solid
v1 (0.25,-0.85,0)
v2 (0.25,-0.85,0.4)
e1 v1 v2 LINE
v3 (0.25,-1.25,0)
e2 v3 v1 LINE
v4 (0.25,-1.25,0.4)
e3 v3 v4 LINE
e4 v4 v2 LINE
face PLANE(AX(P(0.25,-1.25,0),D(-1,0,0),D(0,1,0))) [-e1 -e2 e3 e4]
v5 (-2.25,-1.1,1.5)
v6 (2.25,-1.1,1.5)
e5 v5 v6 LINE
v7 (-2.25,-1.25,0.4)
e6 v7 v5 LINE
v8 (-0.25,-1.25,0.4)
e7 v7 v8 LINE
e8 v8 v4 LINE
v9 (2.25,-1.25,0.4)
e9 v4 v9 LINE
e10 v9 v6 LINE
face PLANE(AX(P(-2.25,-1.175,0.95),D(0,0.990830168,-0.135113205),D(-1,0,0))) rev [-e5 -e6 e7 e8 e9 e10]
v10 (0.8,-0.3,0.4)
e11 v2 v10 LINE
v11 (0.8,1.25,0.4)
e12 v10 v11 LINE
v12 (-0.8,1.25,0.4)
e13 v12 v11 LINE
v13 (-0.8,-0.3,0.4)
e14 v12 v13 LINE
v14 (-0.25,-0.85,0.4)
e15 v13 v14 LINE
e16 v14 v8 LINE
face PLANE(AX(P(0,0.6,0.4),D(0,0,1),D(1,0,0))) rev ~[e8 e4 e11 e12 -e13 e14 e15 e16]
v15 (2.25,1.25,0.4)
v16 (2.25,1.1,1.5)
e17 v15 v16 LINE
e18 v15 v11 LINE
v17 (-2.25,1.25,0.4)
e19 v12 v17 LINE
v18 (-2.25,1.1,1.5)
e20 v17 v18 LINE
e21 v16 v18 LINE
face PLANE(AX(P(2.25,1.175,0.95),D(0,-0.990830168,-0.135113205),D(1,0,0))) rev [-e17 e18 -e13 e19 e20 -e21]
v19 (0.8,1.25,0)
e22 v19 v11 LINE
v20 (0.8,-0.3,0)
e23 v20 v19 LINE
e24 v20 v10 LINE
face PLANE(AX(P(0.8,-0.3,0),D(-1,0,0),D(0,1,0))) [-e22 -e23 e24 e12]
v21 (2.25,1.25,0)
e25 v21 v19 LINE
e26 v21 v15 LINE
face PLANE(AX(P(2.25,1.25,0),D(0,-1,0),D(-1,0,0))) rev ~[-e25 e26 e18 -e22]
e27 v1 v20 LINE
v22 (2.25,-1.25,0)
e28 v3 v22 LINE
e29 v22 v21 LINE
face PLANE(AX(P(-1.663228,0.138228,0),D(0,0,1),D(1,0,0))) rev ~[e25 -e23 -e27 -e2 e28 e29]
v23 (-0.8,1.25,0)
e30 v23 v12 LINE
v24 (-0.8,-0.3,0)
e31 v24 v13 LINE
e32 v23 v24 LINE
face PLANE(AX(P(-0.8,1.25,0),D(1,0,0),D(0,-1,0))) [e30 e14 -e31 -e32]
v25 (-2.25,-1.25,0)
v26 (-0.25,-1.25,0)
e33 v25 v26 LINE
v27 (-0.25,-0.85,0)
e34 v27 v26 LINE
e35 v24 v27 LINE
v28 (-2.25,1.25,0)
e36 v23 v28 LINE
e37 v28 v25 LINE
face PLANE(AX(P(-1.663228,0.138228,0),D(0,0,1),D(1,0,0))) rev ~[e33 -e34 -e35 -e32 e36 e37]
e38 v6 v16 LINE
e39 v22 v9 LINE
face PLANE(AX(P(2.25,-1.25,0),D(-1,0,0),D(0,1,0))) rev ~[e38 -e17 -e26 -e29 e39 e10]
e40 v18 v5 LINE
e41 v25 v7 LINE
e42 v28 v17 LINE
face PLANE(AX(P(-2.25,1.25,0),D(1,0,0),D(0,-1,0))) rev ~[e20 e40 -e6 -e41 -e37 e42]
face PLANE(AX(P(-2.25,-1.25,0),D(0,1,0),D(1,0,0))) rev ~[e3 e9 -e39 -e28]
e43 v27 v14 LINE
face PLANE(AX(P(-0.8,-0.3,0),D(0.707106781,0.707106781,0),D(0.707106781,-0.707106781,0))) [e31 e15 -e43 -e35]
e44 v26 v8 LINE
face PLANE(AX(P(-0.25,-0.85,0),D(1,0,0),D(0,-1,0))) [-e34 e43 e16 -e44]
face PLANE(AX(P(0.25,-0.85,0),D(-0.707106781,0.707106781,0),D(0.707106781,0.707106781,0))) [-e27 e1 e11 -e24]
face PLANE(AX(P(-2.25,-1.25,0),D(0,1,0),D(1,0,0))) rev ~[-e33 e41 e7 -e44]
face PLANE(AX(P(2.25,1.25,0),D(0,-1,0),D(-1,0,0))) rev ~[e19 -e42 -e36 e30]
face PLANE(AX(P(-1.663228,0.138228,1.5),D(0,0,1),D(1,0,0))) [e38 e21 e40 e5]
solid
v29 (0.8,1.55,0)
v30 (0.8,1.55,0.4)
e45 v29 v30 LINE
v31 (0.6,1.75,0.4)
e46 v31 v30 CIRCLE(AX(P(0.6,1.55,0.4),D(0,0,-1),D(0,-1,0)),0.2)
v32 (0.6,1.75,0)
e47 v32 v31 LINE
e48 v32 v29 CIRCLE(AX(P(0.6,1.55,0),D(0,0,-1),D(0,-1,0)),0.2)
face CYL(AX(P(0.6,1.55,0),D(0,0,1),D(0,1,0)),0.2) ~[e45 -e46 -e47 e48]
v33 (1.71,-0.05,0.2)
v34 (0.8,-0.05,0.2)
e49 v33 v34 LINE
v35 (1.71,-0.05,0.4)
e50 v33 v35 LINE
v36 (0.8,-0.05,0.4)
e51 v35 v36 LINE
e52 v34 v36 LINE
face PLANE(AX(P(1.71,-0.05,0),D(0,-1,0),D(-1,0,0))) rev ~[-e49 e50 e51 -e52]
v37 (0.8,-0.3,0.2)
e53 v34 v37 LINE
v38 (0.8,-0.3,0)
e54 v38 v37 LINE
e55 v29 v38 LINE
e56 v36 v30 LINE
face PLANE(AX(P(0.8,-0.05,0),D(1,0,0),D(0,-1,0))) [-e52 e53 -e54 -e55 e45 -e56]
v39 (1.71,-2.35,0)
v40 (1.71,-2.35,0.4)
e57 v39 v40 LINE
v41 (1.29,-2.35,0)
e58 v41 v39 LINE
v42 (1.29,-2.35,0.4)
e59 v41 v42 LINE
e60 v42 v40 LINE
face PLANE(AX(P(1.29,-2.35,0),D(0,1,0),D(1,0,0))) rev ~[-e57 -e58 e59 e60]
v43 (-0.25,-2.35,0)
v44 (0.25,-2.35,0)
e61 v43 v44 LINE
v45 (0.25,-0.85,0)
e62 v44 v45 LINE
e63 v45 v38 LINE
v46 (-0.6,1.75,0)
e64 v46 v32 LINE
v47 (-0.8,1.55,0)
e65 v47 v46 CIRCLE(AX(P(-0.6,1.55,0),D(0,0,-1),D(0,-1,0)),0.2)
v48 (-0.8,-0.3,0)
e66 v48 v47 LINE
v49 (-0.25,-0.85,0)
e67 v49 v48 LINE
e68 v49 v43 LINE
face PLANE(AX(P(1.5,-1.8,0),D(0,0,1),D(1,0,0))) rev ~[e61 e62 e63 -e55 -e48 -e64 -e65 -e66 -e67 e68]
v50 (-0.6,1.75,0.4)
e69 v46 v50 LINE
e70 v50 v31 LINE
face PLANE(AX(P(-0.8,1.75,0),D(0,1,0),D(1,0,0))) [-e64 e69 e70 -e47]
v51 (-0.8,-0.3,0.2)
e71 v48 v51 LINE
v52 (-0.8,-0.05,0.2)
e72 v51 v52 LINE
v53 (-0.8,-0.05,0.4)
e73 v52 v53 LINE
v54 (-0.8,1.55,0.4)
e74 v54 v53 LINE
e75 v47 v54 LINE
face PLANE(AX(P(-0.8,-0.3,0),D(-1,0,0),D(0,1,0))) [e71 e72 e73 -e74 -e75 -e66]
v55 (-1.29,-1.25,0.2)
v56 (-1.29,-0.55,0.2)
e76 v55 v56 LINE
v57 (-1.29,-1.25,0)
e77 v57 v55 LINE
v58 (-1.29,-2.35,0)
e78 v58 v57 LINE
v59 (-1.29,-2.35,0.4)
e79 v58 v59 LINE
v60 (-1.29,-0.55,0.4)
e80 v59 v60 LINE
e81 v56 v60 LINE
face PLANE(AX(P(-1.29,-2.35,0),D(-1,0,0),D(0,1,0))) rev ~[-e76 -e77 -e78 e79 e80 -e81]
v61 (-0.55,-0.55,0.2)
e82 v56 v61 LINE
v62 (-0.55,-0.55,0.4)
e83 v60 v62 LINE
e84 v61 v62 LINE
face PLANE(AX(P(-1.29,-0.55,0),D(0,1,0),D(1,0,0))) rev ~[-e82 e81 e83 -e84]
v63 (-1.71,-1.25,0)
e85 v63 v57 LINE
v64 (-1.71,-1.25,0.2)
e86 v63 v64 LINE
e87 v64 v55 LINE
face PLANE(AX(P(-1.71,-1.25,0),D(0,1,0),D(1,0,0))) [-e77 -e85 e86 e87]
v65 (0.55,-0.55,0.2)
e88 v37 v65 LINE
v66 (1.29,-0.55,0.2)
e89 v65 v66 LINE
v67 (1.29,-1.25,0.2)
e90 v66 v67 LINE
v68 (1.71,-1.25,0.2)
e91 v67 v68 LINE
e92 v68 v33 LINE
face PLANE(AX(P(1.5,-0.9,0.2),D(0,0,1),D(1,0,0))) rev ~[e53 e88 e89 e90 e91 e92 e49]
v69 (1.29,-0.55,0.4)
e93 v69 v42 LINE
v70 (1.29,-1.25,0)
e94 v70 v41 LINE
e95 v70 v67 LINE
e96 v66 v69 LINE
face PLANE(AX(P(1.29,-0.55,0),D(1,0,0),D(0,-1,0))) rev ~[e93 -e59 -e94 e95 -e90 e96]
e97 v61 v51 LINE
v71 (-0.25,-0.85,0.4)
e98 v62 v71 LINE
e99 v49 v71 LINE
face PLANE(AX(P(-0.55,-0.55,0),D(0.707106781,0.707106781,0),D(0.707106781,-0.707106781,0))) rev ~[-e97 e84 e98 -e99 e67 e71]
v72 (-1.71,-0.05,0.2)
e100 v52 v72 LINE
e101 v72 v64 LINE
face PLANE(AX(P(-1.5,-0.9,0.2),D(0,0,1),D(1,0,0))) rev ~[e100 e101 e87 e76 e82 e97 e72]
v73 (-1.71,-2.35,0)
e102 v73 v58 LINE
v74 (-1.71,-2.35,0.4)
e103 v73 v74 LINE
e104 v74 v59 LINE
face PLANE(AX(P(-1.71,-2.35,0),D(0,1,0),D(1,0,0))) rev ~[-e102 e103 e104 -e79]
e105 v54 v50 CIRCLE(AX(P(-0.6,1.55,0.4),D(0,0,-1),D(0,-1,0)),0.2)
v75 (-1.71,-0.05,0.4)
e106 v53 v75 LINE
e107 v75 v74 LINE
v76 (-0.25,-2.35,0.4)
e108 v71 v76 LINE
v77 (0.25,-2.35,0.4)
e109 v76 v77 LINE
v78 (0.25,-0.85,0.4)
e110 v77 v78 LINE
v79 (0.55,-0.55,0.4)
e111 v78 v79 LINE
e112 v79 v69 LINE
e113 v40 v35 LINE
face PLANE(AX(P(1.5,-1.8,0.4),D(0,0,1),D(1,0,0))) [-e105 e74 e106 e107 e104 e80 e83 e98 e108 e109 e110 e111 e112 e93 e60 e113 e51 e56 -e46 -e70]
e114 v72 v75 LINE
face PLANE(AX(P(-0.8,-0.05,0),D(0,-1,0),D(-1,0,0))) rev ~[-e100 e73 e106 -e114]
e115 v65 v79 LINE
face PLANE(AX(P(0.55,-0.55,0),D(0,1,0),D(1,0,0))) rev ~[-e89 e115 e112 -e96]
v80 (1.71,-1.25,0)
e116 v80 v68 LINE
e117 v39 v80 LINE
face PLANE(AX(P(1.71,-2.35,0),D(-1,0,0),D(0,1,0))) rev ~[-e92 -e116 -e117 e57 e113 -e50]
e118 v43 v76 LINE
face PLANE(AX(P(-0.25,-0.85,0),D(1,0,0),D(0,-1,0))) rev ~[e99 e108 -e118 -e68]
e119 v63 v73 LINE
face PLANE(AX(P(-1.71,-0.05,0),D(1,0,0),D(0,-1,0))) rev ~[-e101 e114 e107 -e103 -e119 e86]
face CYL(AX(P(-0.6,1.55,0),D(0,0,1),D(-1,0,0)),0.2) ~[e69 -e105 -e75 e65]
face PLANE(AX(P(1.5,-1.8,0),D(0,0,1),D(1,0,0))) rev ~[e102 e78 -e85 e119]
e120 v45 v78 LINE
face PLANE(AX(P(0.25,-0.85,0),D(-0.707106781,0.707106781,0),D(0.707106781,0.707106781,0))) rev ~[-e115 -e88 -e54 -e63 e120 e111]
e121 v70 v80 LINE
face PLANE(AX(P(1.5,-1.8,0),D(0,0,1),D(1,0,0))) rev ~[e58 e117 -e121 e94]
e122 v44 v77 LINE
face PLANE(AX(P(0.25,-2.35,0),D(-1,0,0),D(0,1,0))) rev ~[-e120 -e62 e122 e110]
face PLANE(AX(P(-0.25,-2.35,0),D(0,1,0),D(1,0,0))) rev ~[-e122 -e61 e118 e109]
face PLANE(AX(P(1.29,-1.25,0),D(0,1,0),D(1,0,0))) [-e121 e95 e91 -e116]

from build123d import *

# Parameters (mm, degrees)
F4_W       = 0.42
F4_H       = 1.1
F4_W_2     = 0.5
F4_H_2     = 0.7
F4_H_3     = 0.25
F4_W_3     = 1.6
F4_H_4     = 1.3
F4_H_5     = 0.5
F5_DEPTH   = 0.4
F6_DEPTH   = 0.2
F7_R       = 0.2
F8_DEPTH   = 1.5
F9_SIZE2   = 0.15
F9_SIZE    = 1.1
F9_2_SIZE2 = 0.15
F9_2_SIZE  = 1.1
F10_DEPTH  = 0.4


with BuildPart() as f5:
    # F4 (on Top) → F5 (new body)
    with BuildSketch(Plane.XY):
        with Locations((1.5, -1.8)):
            Rectangle(F4_W, F4_H)
        with Locations((0, -1.8)):
            Rectangle(F4_W_2, F4_H)
        with Locations((1.5, -0.9)):
            Rectangle(F4_W, F4_H_2)
        Polygon((0.55, -0.55), (1.29, -0.55), (1.29, -0.3), (1.71, -0.3), (1.71, -0.05), (0.8, -0.05), (0.8, -0.3), align=None)
        with Locations((1.5, -0.425)):
            Rectangle(F4_W, F4_H_3)
        with Locations((0, 0.6)):
            Rectangle(F4_W_3, F4_H_4)
        Polygon((-0.25, -1.25), (0.25, -1.25), (0.25, -0.85), (0.25, -0.55), (-0.25, -0.55), (-0.25, -0.85), align=None)
        with Locations((0, -0.425)):
            Rectangle(F4_W_2, F4_H_3)
        Polygon((0.8, -0.3), (0.8, -0.05), (-0.8, -0.05), (-0.8, -0.3), (-0.25, -0.3), (0.25, -0.3), align=None)
        with Locations((-1.5, -0.9)):
            Rectangle(F4_W, F4_H_2)
        with Locations((-1.5, -0.425)):
            Rectangle(F4_W, F4_H_3)
        Polygon((-0.8, -0.3), (-0.8, -0.05), (-1.71, -0.05), (-1.71, -0.3), (-1.29, -0.3), (-1.29, -0.55), (-0.55, -0.55), align=None)
        with Locations((-1.5, -1.8)):
            Rectangle(F4_W, F4_H)
        Polygon((-0.25, -0.3), (-0.8, -0.3), (-0.55, -0.55), (-0.25, -0.55), align=None)
        Polygon((-0.55, -0.55), (-0.25, -0.85), (-0.25, -0.55), align=None)
        Polygon((0.25, -0.55), (0.25, -0.85), (0.55, -0.55), align=None)
        Polygon((0.25, -0.55), (0.55, -0.55), (0.8, -0.3), (0.25, -0.3), align=None)
        with Locations((0, 1.5)):
            Rectangle(F4_W_3, F4_H_5)
    extrude(amount=F5_DEPTH)

    # F4 (on Top) → F6 (cut)
    with BuildSketch(Plane.XY):
        with Locations((1.5, -0.9)):
            Rectangle(F4_W, F4_H_2)
        with Locations((1.5, -0.425)):
            Rectangle(F4_W, F4_H_3)
        Polygon((0.55, -0.55), (1.29, -0.55), (1.29, -0.3), (1.71, -0.3), (1.71, -0.05), (0.8, -0.05), (0.8, -0.3), align=None)
        with Locations((-1.5, -0.9)):
            Rectangle(F4_W, F4_H_2)
        with Locations((-1.5, -0.425)):
            Rectangle(F4_W, F4_H_3)
        Polygon((-0.8, -0.3), (-0.8, -0.05), (-1.71, -0.05), (-1.71, -0.3), (-1.29, -0.3), (-1.29, -0.55), (-0.55, -0.55), align=None)
    extrude(amount=F6_DEPTH, mode=Mode.SUBTRACT)

    # F7
    f7_edges = [f5.edges().sort_by_distance(p)[0] for p in [
        (0.8, 1.75, 0.2),
        (-0.8, 1.75, 0.2),
    ]]
    fillet(f7_edges, radius=F7_R)


with BuildPart() as f8:
    # F4 (on Top) → F8 (new body)
    with BuildSketch(Plane.XY):
        Polygon((-0.8, -0.05), (-0.8, 1.25), (-2.25, 1.25), (-2.25, -1.25), (-1.71, -1.25), (-1.71, -0.55), (-1.71, -0.3), (-1.71, -0.05), align=None)
        Polygon((1.71, -1.25), (2.25, -1.25), (2.25, 1.25), (0.8, 1.25), (0.8, -0.05), (1.71, -0.05), (1.71, -0.3), (1.71, -0.55), align=None)
        with Locations((0, 0.6)):
            Rectangle(F4_W_3, F4_H_4)
        Polygon((-1.29, -1.25), (-0.25, -1.25), (-0.25, -0.85), (-0.55, -0.55), (-1.29, -0.55), align=None)
        Polygon((0.25, -1.25), (1.29, -1.25), (1.29, -0.55), (0.55, -0.55), (0.25, -0.85), align=None)
        with Locations((-1.5, -0.9)):
            Rectangle(F4_W, F4_H_2)
        with Locations((-1.5, -0.425)):
            Rectangle(F4_W, F4_H_3)
        Polygon((-0.8, -0.3), (-0.8, -0.05), (-1.71, -0.05), (-1.71, -0.3), (-1.29, -0.3), (-1.29, -0.55), (-0.55, -0.55), align=None)
        Polygon((0.8, -0.3), (0.8, -0.05), (-0.8, -0.05), (-0.8, -0.3), (-0.25, -0.3), (0.25, -0.3), align=None)
        Polygon((-0.25, -0.3), (-0.8, -0.3), (-0.55, -0.55), (-0.25, -0.55), align=None)
        Polygon((-0.25, -1.25), (0.25, -1.25), (0.25, -0.85), (0.25, -0.55), (-0.25, -0.55), (-0.25, -0.85), align=None)
        Polygon((-0.55, -0.55), (-0.25, -0.85), (-0.25, -0.55), align=None)
        with Locations((0, -0.425)):
            Rectangle(F4_W_2, F4_H_3)
        Polygon((0.25, -0.55), (0.55, -0.55), (0.8, -0.3), (0.25, -0.3), align=None)
        Polygon((0.55, -0.55), (1.29, -0.55), (1.29, -0.3), (1.71, -0.3), (1.71, -0.05), (0.8, -0.05), (0.8, -0.3), align=None)
        Polygon((0.25, -0.55), (0.25, -0.85), (0.55, -0.55), align=None)
        with Locations((1.5, -0.9)):
            Rectangle(F4_W, F4_H_2)
        with Locations((1.5, -0.425)):
            Rectangle(F4_W, F4_H_3)
    extrude(amount=F8_DEPTH)

    # F9
    f9_edges = [f8.edges().sort_by_distance(p)[0] for p in [
        (0, 1.25, 1.5),
    ]]
    f9_side = f8.faces().sort_by_distance((0, 1.25, 0.75))[0]
    chamfer(f9_edges, length=F9_SIZE, length2=F9_SIZE2, reference=f9_side)

    # F9#2
    f9_2_edges = [f8.edges().sort_by_distance(p)[0] for p in [
        (0, -1.25, 1.5),
    ]]
    f9_2_side = f8.faces().sort_by_distance((0, -1.25, 0.75))[0]
    chamfer(f9_2_edges, length=F9_2_SIZE, length2=F9_2_SIZE2, reference=f9_2_side)

    # F4 (on Top) → F10 (cut)
    with BuildSketch(Plane.XY):
        with Locations((0, 0.6)):
            Rectangle(F4_W_3, F4_H_4)
        Polygon((0.8, -0.3), (0.8, -0.05), (-0.8, -0.05), (-0.8, -0.3), (-0.25, -0.3), (0.25, -0.3), align=None)
        Polygon((-0.25, -0.3), (-0.8, -0.3), (-0.55, -0.55), (-0.25, -0.55), align=None)
        Polygon((-0.55, -0.55), (-0.25, -0.85), (-0.25, -0.55), align=None)
        Polygon((-0.25, -1.25), (0.25, -1.25), (0.25, -0.85), (0.25, -0.55), (-0.25, -0.55), (-0.25, -0.85), align=None)
        with Locations((0, -0.425)):
            Rectangle(F4_W_2, F4_H_3)
        Polygon((0.25, -0.55), (0.55, -0.55), (0.8, -0.3), (0.25, -0.3), align=None)
        Polygon((0.25, -0.55), (0.25, -0.85), (0.55, -0.55), align=None)
    extrude(amount=F10_DEPTH, mode=Mode.SUBTRACT)


solid = Compound([f5.part, f8.part])
